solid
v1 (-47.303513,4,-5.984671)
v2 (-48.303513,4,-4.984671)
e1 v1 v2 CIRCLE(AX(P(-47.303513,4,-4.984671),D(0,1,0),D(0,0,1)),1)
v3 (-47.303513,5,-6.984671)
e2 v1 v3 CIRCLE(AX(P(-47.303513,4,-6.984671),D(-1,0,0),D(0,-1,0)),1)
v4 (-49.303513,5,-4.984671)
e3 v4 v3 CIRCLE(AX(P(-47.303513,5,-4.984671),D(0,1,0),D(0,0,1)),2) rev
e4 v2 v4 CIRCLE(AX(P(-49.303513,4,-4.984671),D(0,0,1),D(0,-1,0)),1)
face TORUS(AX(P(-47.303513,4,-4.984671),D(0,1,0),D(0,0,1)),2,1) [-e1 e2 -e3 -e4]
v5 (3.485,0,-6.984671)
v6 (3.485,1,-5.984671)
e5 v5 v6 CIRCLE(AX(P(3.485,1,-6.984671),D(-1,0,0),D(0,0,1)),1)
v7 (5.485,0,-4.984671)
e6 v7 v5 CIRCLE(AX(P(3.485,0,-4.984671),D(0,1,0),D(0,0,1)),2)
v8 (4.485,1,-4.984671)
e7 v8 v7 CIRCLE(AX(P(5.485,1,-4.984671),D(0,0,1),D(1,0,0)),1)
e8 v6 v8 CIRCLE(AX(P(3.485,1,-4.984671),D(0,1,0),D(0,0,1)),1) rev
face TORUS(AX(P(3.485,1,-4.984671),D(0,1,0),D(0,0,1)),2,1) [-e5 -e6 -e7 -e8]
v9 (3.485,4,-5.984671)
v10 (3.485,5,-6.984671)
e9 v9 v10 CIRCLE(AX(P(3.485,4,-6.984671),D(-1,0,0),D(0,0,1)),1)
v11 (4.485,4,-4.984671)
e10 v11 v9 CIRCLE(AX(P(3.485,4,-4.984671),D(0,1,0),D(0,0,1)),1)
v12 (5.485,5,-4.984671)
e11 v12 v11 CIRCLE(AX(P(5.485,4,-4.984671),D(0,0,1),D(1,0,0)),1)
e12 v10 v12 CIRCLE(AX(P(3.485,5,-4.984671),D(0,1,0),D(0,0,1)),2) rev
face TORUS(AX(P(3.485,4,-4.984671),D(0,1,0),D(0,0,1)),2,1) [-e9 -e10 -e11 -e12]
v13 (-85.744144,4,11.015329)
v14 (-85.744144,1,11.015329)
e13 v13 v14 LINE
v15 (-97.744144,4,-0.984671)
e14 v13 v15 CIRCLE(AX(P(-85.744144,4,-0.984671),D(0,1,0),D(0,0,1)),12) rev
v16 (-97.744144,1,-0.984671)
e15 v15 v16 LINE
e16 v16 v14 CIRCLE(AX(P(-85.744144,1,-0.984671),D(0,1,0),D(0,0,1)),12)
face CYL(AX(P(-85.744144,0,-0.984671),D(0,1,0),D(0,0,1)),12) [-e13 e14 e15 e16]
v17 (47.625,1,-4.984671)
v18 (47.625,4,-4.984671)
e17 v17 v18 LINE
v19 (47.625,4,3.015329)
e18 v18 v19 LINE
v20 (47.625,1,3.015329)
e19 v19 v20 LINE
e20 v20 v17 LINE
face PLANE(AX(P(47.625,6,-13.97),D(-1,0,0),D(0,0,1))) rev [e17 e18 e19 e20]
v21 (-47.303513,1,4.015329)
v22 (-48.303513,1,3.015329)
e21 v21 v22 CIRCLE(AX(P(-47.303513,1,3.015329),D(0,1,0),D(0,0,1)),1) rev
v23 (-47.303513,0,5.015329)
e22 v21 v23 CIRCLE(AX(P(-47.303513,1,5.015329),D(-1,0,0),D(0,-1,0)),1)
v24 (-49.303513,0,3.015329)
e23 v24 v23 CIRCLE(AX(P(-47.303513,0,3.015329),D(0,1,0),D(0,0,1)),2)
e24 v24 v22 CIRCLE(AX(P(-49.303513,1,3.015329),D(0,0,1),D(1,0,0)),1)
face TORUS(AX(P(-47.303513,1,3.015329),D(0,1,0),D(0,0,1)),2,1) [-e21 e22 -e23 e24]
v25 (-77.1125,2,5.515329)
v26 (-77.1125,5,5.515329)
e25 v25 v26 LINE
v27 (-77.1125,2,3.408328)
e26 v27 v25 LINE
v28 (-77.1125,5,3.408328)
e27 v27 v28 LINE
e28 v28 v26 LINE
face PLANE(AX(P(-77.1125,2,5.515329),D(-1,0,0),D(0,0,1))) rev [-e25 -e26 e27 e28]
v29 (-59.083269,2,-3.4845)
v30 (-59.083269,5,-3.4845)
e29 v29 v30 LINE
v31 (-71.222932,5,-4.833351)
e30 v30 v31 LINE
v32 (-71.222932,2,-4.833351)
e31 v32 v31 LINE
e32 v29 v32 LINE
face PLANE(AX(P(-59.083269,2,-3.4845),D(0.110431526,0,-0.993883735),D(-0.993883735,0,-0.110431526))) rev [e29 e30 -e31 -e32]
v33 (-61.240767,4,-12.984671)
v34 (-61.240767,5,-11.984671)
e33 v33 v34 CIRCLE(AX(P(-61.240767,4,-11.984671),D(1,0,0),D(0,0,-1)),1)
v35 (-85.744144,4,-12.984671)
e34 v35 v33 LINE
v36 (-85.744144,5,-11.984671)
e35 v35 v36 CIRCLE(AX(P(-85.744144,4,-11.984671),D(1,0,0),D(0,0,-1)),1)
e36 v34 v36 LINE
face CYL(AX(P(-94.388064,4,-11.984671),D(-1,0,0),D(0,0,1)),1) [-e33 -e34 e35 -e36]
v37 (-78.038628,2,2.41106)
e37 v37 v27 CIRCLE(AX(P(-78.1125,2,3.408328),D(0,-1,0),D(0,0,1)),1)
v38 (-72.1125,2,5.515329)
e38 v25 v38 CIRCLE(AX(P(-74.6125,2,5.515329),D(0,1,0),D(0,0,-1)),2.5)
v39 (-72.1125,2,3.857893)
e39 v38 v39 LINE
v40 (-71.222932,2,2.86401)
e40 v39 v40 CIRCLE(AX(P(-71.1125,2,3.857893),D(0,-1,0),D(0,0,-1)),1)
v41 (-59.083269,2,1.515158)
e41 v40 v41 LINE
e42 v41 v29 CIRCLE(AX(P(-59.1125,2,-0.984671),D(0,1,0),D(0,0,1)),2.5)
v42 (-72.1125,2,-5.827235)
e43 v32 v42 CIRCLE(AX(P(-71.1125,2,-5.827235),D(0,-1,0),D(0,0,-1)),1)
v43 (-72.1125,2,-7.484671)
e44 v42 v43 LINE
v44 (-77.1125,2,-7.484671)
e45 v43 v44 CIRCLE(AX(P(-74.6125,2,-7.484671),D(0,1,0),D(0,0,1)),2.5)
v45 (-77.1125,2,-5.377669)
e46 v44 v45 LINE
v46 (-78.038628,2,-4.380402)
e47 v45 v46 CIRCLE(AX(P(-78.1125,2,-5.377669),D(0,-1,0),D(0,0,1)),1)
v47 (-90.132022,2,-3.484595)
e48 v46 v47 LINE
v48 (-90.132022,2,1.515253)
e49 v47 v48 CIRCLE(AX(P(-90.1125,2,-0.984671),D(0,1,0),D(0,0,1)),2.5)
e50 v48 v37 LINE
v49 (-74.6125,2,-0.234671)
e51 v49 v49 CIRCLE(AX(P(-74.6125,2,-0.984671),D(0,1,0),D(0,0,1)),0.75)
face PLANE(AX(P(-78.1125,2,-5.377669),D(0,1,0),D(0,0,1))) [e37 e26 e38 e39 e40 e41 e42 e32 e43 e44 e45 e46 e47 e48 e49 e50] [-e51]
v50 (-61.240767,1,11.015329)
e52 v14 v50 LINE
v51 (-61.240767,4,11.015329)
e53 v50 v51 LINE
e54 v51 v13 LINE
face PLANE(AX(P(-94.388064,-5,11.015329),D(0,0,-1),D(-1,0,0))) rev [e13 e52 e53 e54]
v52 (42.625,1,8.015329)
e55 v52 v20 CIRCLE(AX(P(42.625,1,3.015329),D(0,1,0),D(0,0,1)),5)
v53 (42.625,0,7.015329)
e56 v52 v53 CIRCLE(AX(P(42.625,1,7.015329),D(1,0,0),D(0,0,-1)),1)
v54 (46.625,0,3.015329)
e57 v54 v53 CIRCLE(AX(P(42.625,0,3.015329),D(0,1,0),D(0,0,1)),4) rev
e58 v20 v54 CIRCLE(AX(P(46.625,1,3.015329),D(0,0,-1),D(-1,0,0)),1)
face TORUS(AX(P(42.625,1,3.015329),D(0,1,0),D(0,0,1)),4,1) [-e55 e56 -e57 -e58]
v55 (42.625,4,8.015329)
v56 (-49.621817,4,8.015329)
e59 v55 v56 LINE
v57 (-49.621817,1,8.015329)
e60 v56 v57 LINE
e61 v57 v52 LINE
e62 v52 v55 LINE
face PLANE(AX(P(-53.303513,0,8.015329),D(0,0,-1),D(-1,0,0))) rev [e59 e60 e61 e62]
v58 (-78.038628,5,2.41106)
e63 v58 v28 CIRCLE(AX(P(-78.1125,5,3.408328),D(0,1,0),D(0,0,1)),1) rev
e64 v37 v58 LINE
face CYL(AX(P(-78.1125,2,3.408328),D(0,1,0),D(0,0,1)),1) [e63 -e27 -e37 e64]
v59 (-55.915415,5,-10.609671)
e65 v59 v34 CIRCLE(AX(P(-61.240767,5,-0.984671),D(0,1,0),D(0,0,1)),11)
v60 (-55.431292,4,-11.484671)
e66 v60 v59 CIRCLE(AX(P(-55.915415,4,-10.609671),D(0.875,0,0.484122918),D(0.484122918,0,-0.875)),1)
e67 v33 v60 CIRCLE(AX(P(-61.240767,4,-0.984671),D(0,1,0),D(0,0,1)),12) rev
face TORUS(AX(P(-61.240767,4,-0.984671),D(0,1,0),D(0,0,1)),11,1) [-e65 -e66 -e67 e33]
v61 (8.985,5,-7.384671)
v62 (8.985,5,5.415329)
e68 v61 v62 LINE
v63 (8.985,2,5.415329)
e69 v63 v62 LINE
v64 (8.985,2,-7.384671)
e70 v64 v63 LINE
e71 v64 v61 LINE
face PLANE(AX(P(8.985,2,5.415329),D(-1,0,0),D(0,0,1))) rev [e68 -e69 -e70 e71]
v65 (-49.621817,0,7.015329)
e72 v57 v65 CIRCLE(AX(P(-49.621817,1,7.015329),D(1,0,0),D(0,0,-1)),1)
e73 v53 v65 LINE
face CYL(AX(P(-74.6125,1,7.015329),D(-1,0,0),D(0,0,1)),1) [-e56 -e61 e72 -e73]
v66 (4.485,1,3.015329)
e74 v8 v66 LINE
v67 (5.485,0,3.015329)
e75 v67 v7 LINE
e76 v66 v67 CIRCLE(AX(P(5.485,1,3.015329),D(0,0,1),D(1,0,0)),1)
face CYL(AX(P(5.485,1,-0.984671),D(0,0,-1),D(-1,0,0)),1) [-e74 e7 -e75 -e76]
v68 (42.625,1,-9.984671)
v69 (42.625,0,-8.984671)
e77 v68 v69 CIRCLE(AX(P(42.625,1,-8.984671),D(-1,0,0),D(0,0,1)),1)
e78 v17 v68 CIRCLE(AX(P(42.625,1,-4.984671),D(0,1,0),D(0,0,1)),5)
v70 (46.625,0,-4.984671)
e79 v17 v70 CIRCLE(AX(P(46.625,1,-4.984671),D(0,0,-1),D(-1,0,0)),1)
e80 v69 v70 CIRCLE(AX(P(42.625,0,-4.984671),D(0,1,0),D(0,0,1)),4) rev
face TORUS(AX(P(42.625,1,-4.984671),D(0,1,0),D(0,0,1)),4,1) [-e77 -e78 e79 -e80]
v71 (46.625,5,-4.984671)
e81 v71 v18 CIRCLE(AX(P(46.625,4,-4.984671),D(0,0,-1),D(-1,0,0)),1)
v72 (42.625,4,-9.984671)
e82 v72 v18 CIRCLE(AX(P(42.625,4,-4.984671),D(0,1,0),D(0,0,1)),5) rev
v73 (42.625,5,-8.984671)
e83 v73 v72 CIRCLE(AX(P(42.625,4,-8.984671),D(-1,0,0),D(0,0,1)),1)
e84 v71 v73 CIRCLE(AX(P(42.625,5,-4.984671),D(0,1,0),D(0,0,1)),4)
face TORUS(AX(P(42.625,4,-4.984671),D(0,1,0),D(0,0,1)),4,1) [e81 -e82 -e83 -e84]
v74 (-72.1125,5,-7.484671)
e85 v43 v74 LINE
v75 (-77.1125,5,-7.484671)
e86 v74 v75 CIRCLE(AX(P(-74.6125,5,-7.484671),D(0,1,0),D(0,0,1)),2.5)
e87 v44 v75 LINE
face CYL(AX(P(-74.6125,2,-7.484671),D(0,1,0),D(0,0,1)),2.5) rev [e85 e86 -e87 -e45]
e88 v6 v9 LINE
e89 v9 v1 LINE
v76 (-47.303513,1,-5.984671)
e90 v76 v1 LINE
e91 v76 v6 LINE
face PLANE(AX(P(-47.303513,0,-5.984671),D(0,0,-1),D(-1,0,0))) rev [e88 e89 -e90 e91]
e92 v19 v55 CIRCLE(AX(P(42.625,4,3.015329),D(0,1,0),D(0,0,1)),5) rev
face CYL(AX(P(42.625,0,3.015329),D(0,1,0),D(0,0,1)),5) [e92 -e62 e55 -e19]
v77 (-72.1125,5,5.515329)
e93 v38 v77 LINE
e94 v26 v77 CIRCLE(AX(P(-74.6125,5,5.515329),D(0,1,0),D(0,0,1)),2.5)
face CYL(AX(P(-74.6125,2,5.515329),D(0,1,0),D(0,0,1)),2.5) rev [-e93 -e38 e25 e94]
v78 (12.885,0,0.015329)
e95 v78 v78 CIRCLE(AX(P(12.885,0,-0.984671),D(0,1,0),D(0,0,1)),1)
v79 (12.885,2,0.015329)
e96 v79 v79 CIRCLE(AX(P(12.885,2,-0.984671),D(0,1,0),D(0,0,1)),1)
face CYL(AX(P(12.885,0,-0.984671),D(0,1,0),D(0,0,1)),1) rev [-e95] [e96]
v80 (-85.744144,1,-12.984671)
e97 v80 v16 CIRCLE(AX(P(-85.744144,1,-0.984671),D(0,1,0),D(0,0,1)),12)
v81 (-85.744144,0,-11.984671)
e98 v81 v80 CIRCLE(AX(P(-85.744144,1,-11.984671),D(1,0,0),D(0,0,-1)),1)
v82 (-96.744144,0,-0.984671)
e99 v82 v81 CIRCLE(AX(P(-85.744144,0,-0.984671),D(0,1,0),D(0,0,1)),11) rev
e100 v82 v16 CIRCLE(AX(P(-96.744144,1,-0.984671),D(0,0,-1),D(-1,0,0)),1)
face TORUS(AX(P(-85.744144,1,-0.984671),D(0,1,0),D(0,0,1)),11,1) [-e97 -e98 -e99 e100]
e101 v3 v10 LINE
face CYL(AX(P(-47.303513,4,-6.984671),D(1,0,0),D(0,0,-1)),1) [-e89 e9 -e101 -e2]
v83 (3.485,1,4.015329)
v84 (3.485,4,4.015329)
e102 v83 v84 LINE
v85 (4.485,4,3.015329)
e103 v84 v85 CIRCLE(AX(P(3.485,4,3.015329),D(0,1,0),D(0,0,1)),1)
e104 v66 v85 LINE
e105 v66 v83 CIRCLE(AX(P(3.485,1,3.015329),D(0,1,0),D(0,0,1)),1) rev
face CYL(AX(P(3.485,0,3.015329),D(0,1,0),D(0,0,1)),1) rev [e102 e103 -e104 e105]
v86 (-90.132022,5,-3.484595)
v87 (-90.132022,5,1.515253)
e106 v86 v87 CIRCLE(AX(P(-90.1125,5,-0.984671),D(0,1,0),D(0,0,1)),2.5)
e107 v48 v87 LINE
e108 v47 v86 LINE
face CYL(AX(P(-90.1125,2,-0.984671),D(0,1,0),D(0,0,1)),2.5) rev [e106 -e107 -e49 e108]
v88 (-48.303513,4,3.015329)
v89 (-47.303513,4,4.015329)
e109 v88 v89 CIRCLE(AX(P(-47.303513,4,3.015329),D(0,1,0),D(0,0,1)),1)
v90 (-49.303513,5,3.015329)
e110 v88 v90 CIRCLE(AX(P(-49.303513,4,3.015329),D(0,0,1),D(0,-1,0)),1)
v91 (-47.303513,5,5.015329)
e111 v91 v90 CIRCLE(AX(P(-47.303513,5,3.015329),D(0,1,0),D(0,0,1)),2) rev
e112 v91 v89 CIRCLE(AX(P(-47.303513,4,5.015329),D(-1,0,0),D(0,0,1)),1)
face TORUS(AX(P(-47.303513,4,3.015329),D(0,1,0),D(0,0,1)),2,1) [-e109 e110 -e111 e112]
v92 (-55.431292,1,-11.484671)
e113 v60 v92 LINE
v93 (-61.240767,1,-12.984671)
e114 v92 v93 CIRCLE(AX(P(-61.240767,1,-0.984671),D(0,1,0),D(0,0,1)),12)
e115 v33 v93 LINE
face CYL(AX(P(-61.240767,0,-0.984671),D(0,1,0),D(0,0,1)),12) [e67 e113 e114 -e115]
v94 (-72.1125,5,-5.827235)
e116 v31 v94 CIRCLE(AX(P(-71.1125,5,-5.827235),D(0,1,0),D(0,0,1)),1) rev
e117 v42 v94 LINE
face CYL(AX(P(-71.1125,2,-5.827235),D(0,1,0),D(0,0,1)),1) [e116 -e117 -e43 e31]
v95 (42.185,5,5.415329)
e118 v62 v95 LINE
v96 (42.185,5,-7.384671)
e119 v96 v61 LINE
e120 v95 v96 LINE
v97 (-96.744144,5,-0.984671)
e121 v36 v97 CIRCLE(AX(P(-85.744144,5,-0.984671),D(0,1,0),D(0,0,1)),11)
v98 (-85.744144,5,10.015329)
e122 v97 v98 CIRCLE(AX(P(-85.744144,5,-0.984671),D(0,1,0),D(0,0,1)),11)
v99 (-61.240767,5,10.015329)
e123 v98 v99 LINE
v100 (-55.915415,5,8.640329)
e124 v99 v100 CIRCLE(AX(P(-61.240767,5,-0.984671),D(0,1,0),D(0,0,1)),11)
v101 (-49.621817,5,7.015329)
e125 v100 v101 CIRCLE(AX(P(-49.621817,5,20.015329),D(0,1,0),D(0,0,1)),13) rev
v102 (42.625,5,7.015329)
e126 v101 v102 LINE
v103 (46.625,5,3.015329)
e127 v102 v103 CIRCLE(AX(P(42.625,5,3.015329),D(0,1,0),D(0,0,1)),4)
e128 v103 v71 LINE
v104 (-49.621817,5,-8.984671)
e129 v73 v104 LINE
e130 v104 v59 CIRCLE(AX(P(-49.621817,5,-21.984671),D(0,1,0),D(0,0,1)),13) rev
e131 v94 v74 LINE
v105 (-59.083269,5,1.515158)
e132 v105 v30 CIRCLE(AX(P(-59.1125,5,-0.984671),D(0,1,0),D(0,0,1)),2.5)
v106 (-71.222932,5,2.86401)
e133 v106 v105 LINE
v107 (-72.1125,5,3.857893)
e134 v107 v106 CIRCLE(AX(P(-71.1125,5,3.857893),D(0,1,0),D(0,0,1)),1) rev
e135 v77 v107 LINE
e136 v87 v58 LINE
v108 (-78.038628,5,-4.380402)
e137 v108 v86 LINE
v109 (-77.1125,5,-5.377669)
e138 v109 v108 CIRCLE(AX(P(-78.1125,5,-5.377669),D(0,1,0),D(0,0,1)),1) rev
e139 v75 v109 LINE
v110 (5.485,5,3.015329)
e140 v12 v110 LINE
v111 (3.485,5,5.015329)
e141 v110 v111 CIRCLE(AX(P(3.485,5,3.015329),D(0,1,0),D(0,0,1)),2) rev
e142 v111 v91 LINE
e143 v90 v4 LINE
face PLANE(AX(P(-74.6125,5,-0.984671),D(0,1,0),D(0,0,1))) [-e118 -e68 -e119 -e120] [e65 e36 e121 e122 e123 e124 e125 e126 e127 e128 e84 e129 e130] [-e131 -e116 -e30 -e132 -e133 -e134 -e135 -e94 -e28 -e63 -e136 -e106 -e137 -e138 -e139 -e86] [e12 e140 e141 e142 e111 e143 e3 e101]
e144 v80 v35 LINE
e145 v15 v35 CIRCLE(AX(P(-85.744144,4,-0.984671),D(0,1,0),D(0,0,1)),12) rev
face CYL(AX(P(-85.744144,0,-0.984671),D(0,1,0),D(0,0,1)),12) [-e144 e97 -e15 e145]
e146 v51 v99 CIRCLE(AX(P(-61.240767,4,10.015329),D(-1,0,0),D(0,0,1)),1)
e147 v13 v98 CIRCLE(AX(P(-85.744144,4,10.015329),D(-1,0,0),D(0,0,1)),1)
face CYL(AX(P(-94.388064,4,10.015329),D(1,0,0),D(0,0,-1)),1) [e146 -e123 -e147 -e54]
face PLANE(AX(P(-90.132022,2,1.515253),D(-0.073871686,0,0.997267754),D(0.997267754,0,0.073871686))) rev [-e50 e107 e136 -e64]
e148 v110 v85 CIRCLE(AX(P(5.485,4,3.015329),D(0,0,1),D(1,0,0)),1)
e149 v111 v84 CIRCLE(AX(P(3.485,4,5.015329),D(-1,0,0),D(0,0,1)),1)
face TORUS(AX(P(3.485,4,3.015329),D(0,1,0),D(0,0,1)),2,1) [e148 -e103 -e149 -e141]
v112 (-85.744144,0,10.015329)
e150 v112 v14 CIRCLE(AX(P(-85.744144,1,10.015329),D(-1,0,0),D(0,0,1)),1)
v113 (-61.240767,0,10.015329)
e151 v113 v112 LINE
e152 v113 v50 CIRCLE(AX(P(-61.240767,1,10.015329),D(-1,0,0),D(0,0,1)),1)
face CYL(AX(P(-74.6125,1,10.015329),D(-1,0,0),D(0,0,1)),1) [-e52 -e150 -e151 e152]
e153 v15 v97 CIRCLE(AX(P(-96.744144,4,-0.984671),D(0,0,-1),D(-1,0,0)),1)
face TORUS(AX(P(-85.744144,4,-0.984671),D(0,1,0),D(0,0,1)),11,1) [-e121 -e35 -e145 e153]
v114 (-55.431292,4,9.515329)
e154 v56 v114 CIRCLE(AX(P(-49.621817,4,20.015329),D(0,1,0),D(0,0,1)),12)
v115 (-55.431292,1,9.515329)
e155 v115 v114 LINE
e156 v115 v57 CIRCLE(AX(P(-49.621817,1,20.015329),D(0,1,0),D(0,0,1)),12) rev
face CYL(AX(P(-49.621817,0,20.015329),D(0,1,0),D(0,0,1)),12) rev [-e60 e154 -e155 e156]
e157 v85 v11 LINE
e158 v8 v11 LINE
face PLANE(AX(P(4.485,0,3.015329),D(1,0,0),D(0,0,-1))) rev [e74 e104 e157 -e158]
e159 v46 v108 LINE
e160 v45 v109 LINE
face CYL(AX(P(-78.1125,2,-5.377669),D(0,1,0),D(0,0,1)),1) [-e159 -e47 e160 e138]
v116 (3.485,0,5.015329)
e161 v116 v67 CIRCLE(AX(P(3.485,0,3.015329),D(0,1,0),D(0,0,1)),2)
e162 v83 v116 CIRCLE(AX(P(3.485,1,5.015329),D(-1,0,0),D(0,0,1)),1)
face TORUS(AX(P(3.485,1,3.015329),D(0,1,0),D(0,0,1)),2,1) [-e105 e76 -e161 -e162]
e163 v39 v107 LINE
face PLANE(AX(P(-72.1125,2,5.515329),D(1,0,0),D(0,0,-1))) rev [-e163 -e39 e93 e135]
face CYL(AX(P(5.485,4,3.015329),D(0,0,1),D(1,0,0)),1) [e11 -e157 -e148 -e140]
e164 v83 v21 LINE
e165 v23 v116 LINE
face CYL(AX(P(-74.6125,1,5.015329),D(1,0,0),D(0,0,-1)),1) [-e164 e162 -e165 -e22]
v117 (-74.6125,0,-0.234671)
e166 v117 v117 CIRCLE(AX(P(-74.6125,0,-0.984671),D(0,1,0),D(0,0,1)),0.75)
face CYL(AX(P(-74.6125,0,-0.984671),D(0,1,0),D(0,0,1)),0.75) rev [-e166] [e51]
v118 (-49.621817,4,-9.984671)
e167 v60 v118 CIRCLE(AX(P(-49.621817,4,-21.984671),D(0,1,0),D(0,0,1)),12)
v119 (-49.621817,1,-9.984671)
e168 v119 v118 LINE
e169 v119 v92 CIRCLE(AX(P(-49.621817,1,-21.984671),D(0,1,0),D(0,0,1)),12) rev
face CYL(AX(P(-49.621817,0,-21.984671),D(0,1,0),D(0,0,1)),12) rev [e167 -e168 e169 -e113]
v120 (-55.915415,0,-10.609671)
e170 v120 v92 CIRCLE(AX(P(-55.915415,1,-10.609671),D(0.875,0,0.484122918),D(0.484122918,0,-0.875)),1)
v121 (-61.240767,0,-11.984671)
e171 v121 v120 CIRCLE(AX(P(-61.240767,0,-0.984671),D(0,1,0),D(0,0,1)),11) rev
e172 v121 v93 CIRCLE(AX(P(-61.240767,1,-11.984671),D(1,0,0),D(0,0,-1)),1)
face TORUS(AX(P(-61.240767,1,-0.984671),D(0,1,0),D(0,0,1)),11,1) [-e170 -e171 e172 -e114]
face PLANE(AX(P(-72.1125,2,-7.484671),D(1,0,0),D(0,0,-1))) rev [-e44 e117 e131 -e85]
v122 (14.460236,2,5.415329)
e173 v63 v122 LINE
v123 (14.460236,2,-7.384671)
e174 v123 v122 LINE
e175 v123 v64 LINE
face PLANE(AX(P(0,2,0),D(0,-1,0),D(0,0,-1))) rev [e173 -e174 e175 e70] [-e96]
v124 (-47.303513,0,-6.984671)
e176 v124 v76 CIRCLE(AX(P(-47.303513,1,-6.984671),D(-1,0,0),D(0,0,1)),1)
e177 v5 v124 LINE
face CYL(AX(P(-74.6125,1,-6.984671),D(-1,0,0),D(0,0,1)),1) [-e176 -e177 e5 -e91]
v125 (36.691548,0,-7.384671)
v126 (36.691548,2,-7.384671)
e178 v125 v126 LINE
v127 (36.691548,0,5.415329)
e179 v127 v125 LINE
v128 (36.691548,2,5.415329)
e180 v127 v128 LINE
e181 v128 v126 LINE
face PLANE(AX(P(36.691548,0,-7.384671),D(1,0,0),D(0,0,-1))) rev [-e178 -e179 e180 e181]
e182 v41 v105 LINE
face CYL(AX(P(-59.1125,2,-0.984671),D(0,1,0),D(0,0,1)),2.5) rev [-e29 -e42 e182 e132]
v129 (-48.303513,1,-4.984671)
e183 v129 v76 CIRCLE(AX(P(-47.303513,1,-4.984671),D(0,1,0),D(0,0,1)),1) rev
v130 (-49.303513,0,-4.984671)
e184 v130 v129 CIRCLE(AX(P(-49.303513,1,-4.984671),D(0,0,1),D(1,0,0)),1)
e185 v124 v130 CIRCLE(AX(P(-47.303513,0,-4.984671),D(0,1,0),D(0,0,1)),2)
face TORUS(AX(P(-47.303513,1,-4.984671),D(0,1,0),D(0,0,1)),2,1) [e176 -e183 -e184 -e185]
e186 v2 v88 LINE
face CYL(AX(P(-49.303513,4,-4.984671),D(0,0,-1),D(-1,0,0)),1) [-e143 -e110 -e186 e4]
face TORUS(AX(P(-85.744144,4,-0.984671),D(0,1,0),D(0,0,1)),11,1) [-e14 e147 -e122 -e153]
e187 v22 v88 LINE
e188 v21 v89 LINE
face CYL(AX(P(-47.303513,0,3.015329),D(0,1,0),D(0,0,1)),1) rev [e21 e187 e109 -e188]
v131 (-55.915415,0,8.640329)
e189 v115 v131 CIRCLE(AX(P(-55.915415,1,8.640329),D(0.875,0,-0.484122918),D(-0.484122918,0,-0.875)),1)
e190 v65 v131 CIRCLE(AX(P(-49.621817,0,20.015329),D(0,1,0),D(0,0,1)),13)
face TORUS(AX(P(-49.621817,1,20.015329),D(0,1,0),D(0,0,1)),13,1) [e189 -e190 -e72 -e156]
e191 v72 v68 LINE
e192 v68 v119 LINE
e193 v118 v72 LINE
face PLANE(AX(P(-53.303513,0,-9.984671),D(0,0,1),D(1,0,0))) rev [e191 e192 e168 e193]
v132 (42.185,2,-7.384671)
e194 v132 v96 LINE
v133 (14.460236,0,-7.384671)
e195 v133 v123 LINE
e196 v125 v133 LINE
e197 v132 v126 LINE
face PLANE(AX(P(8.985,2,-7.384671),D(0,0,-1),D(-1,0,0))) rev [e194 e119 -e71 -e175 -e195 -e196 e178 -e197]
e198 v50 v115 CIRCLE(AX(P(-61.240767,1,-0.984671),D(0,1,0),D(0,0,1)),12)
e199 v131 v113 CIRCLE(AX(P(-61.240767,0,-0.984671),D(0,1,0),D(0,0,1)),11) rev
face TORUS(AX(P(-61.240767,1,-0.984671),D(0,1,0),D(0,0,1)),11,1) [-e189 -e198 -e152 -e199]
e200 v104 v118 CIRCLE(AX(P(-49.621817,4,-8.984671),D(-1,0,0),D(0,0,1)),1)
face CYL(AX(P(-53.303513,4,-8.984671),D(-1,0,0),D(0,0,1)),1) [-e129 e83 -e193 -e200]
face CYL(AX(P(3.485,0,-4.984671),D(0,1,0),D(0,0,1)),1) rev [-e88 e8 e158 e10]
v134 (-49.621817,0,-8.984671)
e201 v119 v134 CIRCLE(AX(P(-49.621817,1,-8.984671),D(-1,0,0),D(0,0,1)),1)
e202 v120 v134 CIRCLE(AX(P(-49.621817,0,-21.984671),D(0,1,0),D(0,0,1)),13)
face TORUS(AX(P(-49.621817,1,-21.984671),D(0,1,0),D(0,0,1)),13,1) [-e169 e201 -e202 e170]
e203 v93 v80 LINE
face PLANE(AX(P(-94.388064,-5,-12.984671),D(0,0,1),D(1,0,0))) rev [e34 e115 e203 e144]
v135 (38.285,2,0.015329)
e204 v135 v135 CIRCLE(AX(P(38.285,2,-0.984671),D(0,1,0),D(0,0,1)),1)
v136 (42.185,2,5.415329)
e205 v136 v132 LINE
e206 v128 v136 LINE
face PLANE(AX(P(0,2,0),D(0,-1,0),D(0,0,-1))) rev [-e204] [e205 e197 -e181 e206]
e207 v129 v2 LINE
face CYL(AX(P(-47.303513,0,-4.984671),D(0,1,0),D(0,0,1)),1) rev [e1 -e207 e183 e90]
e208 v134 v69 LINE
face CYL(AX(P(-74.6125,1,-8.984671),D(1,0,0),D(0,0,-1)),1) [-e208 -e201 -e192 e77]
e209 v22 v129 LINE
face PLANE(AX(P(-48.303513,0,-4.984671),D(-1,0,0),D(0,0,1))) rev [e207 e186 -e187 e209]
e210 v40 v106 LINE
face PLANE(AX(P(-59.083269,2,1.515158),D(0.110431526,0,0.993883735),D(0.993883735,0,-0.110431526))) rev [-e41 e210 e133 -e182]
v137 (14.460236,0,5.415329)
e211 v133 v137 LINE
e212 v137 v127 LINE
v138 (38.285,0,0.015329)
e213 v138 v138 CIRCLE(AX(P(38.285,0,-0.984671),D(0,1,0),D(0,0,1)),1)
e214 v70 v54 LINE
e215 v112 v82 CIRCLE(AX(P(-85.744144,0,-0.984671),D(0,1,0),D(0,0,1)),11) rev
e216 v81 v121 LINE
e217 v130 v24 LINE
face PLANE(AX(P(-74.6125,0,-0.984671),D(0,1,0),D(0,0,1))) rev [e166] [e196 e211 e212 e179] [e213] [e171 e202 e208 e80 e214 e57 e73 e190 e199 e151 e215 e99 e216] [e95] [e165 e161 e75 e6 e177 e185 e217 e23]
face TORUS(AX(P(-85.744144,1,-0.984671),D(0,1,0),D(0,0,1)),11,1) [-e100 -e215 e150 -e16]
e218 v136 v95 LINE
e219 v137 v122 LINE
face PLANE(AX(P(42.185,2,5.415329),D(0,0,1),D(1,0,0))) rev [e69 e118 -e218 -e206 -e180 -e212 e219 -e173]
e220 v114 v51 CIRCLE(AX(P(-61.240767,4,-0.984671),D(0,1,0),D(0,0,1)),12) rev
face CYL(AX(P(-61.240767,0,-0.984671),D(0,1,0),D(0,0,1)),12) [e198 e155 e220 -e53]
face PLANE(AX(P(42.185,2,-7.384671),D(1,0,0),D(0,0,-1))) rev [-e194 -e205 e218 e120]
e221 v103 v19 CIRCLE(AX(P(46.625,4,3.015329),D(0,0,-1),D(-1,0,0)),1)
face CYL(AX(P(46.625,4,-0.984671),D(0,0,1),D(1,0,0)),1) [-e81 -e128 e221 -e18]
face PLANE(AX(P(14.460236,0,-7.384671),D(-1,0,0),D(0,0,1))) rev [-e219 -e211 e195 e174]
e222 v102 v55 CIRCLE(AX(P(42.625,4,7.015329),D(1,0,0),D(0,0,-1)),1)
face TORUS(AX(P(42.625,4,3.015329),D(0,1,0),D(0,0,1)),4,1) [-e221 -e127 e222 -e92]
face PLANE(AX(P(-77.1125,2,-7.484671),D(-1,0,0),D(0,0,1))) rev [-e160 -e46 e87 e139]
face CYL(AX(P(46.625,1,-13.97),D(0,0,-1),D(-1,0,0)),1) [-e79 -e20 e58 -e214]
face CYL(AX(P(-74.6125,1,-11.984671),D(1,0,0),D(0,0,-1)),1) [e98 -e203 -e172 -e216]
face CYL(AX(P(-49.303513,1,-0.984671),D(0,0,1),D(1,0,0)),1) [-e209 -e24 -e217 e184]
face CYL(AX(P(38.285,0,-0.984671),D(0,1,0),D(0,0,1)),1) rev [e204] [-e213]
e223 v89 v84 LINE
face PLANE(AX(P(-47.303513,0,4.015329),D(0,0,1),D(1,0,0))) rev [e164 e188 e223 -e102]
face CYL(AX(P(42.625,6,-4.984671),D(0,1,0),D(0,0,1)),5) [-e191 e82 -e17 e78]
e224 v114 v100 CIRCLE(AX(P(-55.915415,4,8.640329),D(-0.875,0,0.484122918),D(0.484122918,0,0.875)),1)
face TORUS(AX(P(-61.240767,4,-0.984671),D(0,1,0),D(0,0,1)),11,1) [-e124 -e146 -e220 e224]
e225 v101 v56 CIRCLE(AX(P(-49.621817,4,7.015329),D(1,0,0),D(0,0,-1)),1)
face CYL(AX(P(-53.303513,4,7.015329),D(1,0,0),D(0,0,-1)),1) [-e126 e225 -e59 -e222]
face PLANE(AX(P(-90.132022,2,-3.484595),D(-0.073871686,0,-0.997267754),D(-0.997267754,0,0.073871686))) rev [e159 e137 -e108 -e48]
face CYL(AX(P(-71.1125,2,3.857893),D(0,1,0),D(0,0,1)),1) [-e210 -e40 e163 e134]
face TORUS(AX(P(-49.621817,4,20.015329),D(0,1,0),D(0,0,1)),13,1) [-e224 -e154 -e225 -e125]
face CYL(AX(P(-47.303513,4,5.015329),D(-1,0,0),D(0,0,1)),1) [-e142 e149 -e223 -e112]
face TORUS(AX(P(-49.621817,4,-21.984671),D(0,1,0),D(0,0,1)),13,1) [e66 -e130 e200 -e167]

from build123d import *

# Parameters (mm, degrees)
BOSS_EXTRUDE1_DEPTH = 6
CUT_EXTRUDE2_START  = -1
CUT_EXTRUDE2_DEPTH  = 1
SKETCH17_R          = 0.75
CUT_EXTRUDE8_DEPTH  = 4
SKETCH18_R          = 0.75
CUT_EXTRUDE9_DEPTH  = 107.032849905
SKETCH19_W          = 33.2
SKETCH19_H          = 12.8
CUT_EXTRUDE10_DEPTH = 4
SKETCH20_R          = 1
SKETCH20_W          = 22.23131136
SKETCH20_H          = 12.8
CUT_EXTRUDE11_DEPTH = 106.957374727
CUT_EXTRUDE14_DEPTH = 107.084707941
CUT_EXTRUDE15_DEPTH = 101.853925106
FILLET1_R           = 5
CUT_EXTRUDE16_DEPTH = 10
FILLET2_R           = 12
FILLET3_R           = 12
FILLET4_R           = 12
FILLET5_R           = 12
FILLET6_R           = 1
FILLET7_R           = 1


# Read off the part's stored shape, not the designer's step: Cut-Extrude2
# Some blends are built 0.0001 mm under size
with BuildPart() as part:
    # Sketch1 → Boss-Extrude1 (new body)
    with BuildSketch(Plane(origin=(0, 0, 0), x_dir=(1, 0, 0), z_dir=(0, 1, 0))):
        with BuildLine():
            Line((0, 13.97), (47.625, 13.97))
            Line((47.625, 13.97), (47.625, 1.969341724))
            Line((47.625, 1.969341724), (47.625, -12.000658276))
            Line((47.625, -12.000658276), (0, -12.000658276))
            Line((0, -12.000658276), (-47.625, -12.000658276))
            Line((-47.625, -12.000658276), (-50.459972113, -12.000658276))
            ThreePointArc((-50.459972113, -12.000658276), (-102.034450626, 0.984670862), (-50.459972113, 13.97))
            Line((-50.459972113, 13.97), (-47.625, 13.97))
            Line((-47.625, 13.97), (0, 13.97))
        make_face()
    extrude(amount=BOSS_EXTRUDE1_DEPTH)

    # Cut-Extrude2 outline → Cut-Extrude2 (cut)
    with BuildSketch(Plane(origin=(0, 6, 0), x_dir=(1, 0, 0), z_dir=(0, 1, 0)).offset(CUT_EXTRUDE2_START)):
        with BuildLine():
            ThreePointArc((-50.459972113, 13.97), (-102.034450626, 0.984670862), (-50.459972113, -12.000658276))
            Line((-50.459972113, -12.000658276), (47.625, -12.000658276))
            Line((47.625, -12.000658276), (47.625, 13.97))
            Line((47.625, 13.97), (-50.459972113, 13.97))
        make_face()
    extrude(amount=CUT_EXTRUDE2_DEPTH, mode=Mode.SUBTRACT)

    # Sketch17 → Cut-Extrude8 (cut)
    with BuildSketch(Plane(origin=(0, 6, 0), x_dir=(1, 0, 0), z_dir=(0, 1, 0))):
        with BuildLine():
            Line((-59.083269409, 3.484499971), (-71.222931526, 4.833351317))
            ThreePointArc((-71.222931526, 4.833351317), (-71.857628018, 5.160313589), (-72.1125, 5.827235052))
            Line((-72.1125, 5.827235052), (-72.1125, 7.484670862))
            ThreePointArc((-72.1125, 7.484670862), (-74.6125, 9.984670862), (-77.1125, 7.484670862))
            Line((-77.1125, 7.484670862), (-77.1125, 5.377669348))
            ThreePointArc((-77.1125, 5.377669348), (-77.379740938, 4.697181172), (-78.038628314, 4.380401593))
            Line((-78.038628314, 4.380401593), (-90.132022217, 3.484594638))
            ThreePointArc((-90.132022217, 3.484594638), (-92.6125, 0.984670862), (-90.132022217, -1.515252913))
            Line((-90.132022217, -1.515252913), (-78.038628314, -2.411059869))
            ThreePointArc((-78.038628314, -2.411059869), (-77.379740938, -2.727839448), (-77.1125, -3.408327624))
            Line((-77.1125, -3.408327624), (-77.1125, -5.515329138))
            ThreePointArc((-77.1125, -5.515329138), (-74.6125, -8.015329138), (-72.1125, -5.515329138))
            Line((-72.1125, -5.515329138), (-72.1125, -3.857893328))
            ThreePointArc((-72.1125, -3.857893328), (-71.857628018, -3.190971865), (-71.222931526, -2.864009593))
            Line((-71.222931526, -2.864009593), (-59.083269409, -1.515158247))
            ThreePointArc((-59.083269409, -1.515158247), (-56.6125, 0.984670862), (-59.083269409, 3.484499971))
        make_face()
        with Locations(Location((-74.6125, 0.984670862, 0), (0, 0, 270))):
            Circle(SKETCH17_R, mode=Mode.SUBTRACT)
    extrude(amount=-CUT_EXTRUDE8_DEPTH, mode=Mode.SUBTRACT)

    # Sketch18 → Cut-Extrude9 (cut, through all)
    with BuildSketch(Plane(origin=(0, 5, 0), x_dir=(1, 0, 0), z_dir=(0, 1, 0))):
        with Locations(Location((-74.6125, 0.984670862, 0), (0, 0, 270))):
            Circle(SKETCH18_R)
    extrude(amount=-CUT_EXTRUDE9_DEPTH, mode=Mode.SUBTRACT)

    # Sketch19 → Cut-Extrude10 (cut)
    with BuildSketch(Plane(origin=(0, 6, 0), x_dir=(1, 0, 0), z_dir=(0, 1, 0))):
        with Locations((25.585, 0.984670862)):
            Rectangle(SKETCH19_W, SKETCH19_H)
    extrude(amount=-CUT_EXTRUDE10_DEPTH, mode=Mode.SUBTRACT)

    # Sketch20 → Cut-Extrude11 (cut, through all)
    with BuildSketch(Plane(origin=(0, 2, 0), x_dir=(1, 0, 0), z_dir=(0, 1, 0))):
        with Locations(Location((12.885, 0.984670862, 0), (0, 0, 270))):
            Circle(SKETCH20_R)
        with Locations(Location((38.285, 0.984670862, 0), (0, 0, 270))):
            Circle(SKETCH20_R)
        with Locations((25.575892078, 0.984670862)):
            Rectangle(SKETCH20_W, SKETCH20_H)
    extrude(amount=-CUT_EXTRUDE11_DEPTH, mode=Mode.SUBTRACT)

    # Sketch21 → Cut-Extrude14 (cut, through all)
    with BuildSketch(Plane(origin=(0, 6, 0), x_dir=(1, 0, 0), z_dir=(0, 1, 0))):
        with BuildLine():
            Line((-53.303512895, 9.984670862), (47.625, 9.984670862))
            Line((47.625, 9.984670862), (47.625, 13.97))
            Line((47.625, 13.97), (-50.459972113, 13.97))
            ThreePointArc((-50.459972113, 13.97), (-102.034450626, 0.984670862), (-50.459972113, -12.000658276))
            Line((-50.459972113, -12.000658276), (47.625, -12.000658276))
            Line((47.625, -12.000658276), (47.625, -8.015329138))
            Line((47.625, -8.015329138), (-53.303512895, -8.015329138))
            ThreePointArc((-53.303512895, -8.015329138), (-97.74414351, 0.984670862), (-53.303512895, 9.984670862))
        make_face()
    extrude(amount=-CUT_EXTRUDE14_DEPTH, mode=Mode.SUBTRACT)

    # Sketch23 → Cut-Extrude15 (cut, through all)
    with BuildSketch(Plane(origin=(0, 6, 0), x_dir=(1, 0, 0), z_dir=(0, 1, 0))):
        with BuildLine():
            Line((-48.303512895, 4.984670862), (-48.303512895, -3.015329138))
            ThreePointArc((-48.303512895, -3.015329138), (-48.010619676, -3.722435919), (-47.303512895, -4.015329138))
            Line((-47.303512895, -4.015329138), (3.485, -4.015329138))
            ThreePointArc((3.485, -4.015329138), (4.192106781, -3.722435919), (4.485, -3.015329138))
            Line((4.485, -3.015329138), (4.485, 4.984670862))
            ThreePointArc((4.485, 4.984670862), (4.192106781, 5.691777643), (3.485, 5.984670862))
            Line((3.485, 5.984670862), (-47.303512895, 5.984670862))
            ThreePointArc((-47.303512895, 5.984670862), (-48.010619676, 5.691777643), (-48.303512895, 4.984670862))
        make_face()
    extrude(amount=-CUT_EXTRUDE15_DEPTH, mode=Mode.SUBTRACT)

    # Fillet1
    fillet1_edges = [part.edges().sort_by_distance(p)[0] for p in [
        (47.625, 2.5, 8.015329138),
        (47.625, 2.5, -9.984670862),
    ]]
    fillet(fillet1_edges, radius=FILLET1_R)

    # Sketch25 → Cut-Extrude16 (cut)
    with BuildSketch(Plane(origin=(0, 5, 0), x_dir=(1, 0, 0), z_dir=(0, 1, 0))):
        with BuildLine():
            Line((-94.388063999, -11.015329138), (-54.836936001, -11.015329138))
            ThreePointArc((-54.836936001, -11.015329138), (-74.6125, -22.146972648), (-94.388063999, -11.015329138))
        make_face()
        with BuildLine():
            Line((-94.388063999, 12.984670862), (-54.836936001, 12.984670862))
            ThreePointArc((-54.836936001, 12.984670862), (-74.6125, 24.116314372), (-94.388063999, 12.984670862))
        make_face()
    extrude(amount=-CUT_EXTRUDE16_DEPTH, mode=Mode.SUBTRACT)

    # Fillet2
    # the kernel refuses this fillet: 12 mm, written as the material it takes off along each edge
    with BuildSketch(Plane(origin=(-54.836936001, 21.009577066, -12.984670862), x_dir=(-1, 0, 0), z_dir=(0, -1, 0))) as fillet2_piece_1:
        with BuildLine():
            CenterArc((6.403830826, -12), FILLET2_R, 90, 41.409622109)
            Line((-1.533423107, -3), (-1.692168186, -2.82))
            ThreePointArc((-1.692168186, -2.82), (-1.035105589, -1.362812794), (-0.20517934, 0.124504772))
            Line((-0.20517934, 0.124504772), (0, 0.24))
            Line((0, 0.24), (6.403830826, 0.24))
            Line((6.403830826, 0.24), (6.403830826, 0))
        make_face()
    extrude(amount=37.019154131, mode=Mode.SUBTRACT)

    # Fillet3
    fillet3_edges = [part.edges().sort_by_distance(p)[0] for p in [
        (-94.388063999, 2.5, 11.015329138),
        (-94.388063999, 2.5, -12.984670862),
    ]]
    fillet(fillet3_edges, radius=FILLET3_R - 0.0001)  # a hair under: the kernel refuses the full size

    # Fillet4
    # the kernel refuses this fillet: 12 mm, written as the material it takes off along each edge
    with BuildSketch(Plane(origin=(-54.836936001, 21.009577066, 11.015329138), x_dir=(-1, 0, 0), z_dir=(0, -1, 0))) as fillet4_piece_1:
        with BuildLine():
            CenterArc((6.403830826, 12), FILLET4_R, 228.590377891, 41.409622109)
            Line((-1.533423107, 3), (-1.692168186, 2.82))
            ThreePointArc((-1.692168186, 2.82), (-1.035105589, 1.362812794), (-0.20517934, -0.124504772))
            Line((-0.20517934, -0.124504772), (0, -0.24))
            Line((0, -0.24), (6.403830826, -0.24))
            Line((6.403830826, -0.24), (6.403830826, 0))
        make_face()
    extrude(amount=37.019154131, mode=Mode.SUBTRACT)

    # Fillet5
    fillet5_edges = [part.edges().sort_by_distance(p)[0] for p in [
        (-53.303512895, 2.5, -9.984670862),
        (-53.303512895, 2.5, 8.015329138),
    ]]
    fillet(fillet5_edges, radius=FILLET5_R)

    # Fillet6
    fillet6_edges = [part.edges().sort_by_distance(p)[0] for p in [
        (-3.498408395, 5, 8.015329138),
        (-3.498408395, 0, 8.015329138),
        (47.625, 5, -0.984670862),
        (46.160533906, 5, -8.520204768),
        (46.160533906, 5, 6.550863044),
        (47.625, 0, -0.984670862),
        (46.160533906, 0, -8.520204768),
        (46.160533906, 0, 6.550863044),
        (-58.240766828, 0, -12.603620901),
        (-73.492505169, 5, -12.984670862),
        (-94.22941606, 5, -9.470019638),
        (-94.22941606, 5, 7.500677914),
        (-73.492505169, 0, -12.984670862),
        (-94.22941606, 0, -9.470019638),
        (-94.22941606, 0, 7.500677914),
        (-73.492505169, 0, 11.015329138),
        (-73.492505169, 5, 11.015329138),
        (-58.240766828, 5, 10.634279177),
        (-58.240766828, 0, 10.634279177),
        (-3.498408395, 5, -9.984670862),
        (-3.498408395, 0, -9.984670862),
        (-58.240766828, 5, -12.603620901),
        (-52.621816789, 5, 8.396379099),
        (-52.621816789, 0, 8.396379099),
        (-52.621816789, 5, -10.365720823),
        (-52.621816789, 0, -10.365720823),
    ]]
    fillet(fillet6_edges, radius=FILLET6_R)

    # Fillet7
    fillet7_edges = [part.edges().sort_by_distance(p)[0] for p in [
        (-48.303512895, 5, -0.984670862),
        (-48.010619676, 5, 3.722435919),
        (-21.909256447, 5, 4.015329138),
        (4.192106781, 5, 3.722435919),
        (4.485, 5, -0.984670862),
        (4.192106781, 5, -5.691777643),
        (-21.909256447, 5, -5.984670862),
        (-48.010619676, 5, -5.691777643),
        (-48.010619676, 0, -5.691777643),
        (-21.909256447, 0, -5.984670862),
        (4.192106781, 0, -5.691777643),
        (4.485, 0, -0.984670862),
        (4.192106781, 0, 3.722435919),
        (-21.909256447, 0, 4.015329138),
        (-48.010619676, 0, 3.722435919),
        (-48.303512895, 0, -0.984670862),
    ]]
    fillet(fillet7_edges, radius=FILLET7_R)


solid = part.part
